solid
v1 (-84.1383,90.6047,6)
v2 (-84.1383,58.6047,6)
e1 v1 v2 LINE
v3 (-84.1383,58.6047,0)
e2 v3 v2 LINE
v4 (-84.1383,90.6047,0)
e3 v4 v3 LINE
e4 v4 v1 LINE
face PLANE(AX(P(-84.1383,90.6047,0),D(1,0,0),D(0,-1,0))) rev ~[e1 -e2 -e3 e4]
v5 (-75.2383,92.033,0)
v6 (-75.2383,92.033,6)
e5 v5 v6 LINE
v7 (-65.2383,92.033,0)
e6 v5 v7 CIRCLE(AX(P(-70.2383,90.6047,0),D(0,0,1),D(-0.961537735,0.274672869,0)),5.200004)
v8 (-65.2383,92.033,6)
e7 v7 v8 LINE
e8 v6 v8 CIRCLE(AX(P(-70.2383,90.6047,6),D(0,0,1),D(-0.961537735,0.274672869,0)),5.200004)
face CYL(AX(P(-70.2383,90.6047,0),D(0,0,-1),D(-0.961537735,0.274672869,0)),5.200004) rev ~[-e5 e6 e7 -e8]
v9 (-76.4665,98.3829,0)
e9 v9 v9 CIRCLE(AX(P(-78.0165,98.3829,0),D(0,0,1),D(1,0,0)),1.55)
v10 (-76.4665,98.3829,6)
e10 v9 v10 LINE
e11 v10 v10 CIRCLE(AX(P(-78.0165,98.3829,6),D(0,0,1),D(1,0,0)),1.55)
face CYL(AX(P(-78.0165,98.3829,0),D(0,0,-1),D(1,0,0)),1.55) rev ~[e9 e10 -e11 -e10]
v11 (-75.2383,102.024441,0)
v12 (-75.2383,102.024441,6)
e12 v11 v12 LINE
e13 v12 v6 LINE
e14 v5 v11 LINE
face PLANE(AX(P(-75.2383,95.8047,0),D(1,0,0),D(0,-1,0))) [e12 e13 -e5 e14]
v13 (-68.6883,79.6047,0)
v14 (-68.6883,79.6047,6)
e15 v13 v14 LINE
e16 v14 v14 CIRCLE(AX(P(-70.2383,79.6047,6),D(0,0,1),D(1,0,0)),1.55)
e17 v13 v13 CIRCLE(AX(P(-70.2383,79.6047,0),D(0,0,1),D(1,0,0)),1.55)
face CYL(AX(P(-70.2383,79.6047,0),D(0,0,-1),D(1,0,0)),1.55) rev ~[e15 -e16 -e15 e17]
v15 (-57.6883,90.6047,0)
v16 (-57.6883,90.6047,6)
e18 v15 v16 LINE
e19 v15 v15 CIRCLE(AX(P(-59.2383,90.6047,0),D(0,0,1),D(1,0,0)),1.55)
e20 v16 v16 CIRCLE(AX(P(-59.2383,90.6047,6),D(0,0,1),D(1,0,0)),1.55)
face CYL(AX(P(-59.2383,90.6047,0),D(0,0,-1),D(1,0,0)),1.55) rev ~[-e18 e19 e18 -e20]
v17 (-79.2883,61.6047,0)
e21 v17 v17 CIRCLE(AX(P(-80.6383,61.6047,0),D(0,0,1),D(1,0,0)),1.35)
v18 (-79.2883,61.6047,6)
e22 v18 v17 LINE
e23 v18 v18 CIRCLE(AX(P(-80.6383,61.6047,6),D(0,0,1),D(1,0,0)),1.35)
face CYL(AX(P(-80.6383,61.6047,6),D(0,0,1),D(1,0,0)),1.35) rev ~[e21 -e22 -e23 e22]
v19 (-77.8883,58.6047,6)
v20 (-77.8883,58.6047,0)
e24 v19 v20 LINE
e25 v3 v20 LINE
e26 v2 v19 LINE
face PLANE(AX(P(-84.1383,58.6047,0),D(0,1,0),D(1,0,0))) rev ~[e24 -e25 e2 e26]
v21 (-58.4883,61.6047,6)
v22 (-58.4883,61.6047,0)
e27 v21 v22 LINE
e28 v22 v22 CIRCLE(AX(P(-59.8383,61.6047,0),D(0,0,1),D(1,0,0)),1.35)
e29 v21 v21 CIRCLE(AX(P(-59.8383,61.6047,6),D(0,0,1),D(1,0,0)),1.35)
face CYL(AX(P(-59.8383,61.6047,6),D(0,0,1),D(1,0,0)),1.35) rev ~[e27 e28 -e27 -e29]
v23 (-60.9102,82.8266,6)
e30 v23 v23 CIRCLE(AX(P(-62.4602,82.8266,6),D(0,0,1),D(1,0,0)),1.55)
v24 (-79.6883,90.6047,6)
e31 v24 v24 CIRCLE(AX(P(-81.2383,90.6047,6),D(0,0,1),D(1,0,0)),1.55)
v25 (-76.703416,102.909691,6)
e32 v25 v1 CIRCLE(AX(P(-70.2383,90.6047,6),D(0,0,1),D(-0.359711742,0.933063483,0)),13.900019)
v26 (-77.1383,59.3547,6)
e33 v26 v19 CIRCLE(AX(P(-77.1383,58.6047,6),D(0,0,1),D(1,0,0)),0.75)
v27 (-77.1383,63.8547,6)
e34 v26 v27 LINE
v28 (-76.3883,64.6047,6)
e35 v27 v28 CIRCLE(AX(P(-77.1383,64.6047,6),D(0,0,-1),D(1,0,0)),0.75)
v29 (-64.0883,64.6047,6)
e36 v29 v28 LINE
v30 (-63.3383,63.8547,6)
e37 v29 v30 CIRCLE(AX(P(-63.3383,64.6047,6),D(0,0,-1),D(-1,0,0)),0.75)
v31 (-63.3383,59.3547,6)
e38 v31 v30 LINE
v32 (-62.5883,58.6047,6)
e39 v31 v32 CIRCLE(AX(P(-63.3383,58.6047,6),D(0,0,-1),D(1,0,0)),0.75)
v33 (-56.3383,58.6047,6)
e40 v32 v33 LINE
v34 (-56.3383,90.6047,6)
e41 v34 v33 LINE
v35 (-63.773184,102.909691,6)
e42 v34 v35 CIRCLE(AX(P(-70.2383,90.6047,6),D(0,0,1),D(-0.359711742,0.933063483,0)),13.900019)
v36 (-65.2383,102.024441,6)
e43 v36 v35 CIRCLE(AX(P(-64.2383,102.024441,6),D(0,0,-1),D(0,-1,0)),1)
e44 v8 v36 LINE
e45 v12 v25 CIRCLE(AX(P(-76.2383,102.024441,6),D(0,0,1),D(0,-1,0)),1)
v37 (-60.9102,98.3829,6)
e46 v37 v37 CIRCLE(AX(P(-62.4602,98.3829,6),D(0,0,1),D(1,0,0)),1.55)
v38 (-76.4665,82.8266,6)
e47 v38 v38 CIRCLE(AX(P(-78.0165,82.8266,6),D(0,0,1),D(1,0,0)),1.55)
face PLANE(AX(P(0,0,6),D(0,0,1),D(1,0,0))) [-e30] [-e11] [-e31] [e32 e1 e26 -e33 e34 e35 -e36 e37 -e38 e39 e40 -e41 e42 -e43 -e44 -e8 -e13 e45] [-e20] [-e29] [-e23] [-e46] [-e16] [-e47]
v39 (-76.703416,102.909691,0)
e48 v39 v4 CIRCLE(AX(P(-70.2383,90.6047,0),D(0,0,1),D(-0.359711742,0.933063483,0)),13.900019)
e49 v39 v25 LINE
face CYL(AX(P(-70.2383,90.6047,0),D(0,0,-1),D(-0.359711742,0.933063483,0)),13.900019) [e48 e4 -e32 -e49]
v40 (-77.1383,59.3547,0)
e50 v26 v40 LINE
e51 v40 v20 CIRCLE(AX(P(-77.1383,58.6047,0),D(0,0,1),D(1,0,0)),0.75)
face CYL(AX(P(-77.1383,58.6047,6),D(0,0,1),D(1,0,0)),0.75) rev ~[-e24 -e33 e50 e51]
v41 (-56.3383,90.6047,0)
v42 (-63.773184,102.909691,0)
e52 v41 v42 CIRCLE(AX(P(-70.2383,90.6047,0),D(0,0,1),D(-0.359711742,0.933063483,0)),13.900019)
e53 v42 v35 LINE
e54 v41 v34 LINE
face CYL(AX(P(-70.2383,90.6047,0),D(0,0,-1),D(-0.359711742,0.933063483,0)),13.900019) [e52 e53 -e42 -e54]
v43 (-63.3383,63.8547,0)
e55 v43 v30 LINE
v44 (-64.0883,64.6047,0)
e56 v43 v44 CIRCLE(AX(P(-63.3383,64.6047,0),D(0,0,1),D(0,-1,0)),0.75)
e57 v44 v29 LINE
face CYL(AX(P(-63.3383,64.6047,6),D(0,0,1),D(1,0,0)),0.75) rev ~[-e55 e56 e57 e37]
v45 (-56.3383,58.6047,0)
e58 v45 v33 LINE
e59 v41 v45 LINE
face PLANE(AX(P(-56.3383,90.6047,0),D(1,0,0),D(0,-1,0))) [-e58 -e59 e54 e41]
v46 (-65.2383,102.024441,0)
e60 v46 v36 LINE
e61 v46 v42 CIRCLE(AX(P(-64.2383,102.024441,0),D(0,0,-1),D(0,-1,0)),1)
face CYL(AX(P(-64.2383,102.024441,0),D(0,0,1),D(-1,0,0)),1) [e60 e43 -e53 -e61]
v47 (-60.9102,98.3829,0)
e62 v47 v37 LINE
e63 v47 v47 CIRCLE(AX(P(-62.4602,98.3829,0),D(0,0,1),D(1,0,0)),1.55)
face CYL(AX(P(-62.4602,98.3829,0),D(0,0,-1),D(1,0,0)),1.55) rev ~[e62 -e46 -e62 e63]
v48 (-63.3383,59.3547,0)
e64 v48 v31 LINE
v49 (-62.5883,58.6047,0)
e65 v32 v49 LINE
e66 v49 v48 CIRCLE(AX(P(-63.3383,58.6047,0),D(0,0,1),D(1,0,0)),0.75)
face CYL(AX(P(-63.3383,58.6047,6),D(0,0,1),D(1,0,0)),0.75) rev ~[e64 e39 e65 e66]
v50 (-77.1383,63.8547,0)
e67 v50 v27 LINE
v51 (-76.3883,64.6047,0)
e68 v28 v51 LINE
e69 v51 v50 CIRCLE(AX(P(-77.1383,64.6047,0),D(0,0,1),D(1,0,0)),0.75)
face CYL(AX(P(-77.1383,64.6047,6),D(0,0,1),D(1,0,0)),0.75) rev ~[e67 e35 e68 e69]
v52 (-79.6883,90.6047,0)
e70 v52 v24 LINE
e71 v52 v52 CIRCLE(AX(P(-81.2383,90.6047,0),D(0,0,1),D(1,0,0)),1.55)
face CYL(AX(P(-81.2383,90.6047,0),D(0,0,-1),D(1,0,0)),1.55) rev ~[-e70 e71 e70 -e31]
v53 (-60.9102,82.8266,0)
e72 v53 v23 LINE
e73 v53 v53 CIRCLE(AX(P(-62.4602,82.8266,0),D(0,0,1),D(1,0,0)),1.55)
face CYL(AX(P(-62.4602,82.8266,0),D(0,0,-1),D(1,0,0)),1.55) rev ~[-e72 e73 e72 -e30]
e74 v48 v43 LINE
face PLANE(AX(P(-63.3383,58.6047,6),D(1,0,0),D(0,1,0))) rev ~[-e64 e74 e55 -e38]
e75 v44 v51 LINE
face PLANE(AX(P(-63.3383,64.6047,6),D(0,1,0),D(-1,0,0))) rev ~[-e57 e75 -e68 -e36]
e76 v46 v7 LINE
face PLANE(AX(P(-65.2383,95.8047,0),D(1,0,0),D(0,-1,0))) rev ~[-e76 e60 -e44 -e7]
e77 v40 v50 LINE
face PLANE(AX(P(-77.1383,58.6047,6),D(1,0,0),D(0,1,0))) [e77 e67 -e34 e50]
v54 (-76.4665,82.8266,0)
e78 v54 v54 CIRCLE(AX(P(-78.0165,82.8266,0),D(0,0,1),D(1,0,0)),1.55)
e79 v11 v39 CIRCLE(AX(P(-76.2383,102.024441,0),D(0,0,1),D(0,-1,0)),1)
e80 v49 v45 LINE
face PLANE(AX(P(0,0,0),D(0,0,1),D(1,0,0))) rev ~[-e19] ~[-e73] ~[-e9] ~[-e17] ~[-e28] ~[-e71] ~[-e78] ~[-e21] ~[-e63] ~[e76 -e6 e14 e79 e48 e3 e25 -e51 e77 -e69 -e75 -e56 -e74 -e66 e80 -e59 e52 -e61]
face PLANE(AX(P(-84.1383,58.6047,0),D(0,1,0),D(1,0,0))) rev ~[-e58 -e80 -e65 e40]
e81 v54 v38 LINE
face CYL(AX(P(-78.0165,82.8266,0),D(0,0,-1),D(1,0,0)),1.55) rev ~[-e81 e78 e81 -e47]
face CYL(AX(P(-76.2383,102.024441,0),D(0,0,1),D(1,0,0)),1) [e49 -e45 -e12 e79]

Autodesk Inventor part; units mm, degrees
ref_plane "YZ Plane" through (0, 0, 0) normal (1, 0, 0) x (0, 1, 0)
ref_plane "XZ Plane" through (0, 0, 0) normal (0, 1, 0) x (-1, 0, 0)
ref_plane "작업 평면1" through (0, 0, 0) normal (0, 0, 1) x (1, 0, 0)
sketch "스케치1" plane through (0, 0, 0) normal (0, 0, 1) x (1, 0, 0)
  circle A0 centre (-78.0165, 82.8266) radius 1.55
  circle A1 centre (-62.4602, 82.8266) radius 1.55
  circle A2 centre (-62.4602, 98.3829) radius 1.55
  circle A3 centre (-78.0165, 98.3829) radius 1.55
  circle A4 centre (-70.2383, 101.6047) radius 1.55
  circle A5 centre (-59.2383, 90.6047) radius 1.55
  circle A6 centre (-70.2383, 79.6047) radius 1.55
  circle A7 centre (-81.2383, 90.6047) radius 1.55
  arc A8 (-75.2383, 92.033) -> (-65.2383, 92.033) centre (-70.2383, 90.6047) ccw
  arc A9 (-75.2383, 103.5743) -> (-65.2383, 103.5743) centre (-70.2383, 90.6047) ccw
  line L0 (-65.2383, 95.8047) -> (-65.2383, 103.5743)
  line L1 (-75.2383, 95.8047) -> (-75.2383, 103.5743)
  line L2 (-65.2383, 95.8047) -> (-65.2383, 92.033)
  line L3 (-75.2383, 95.8047) -> (-75.2383, 92.033)
  circle A10 centre (-70.2383, 90.6047) radius 1.5
  circle A11 centre (-62.4602, 98.3829) radius 1.65
  circle A12 centre (-59.2383, 90.6047) radius 1.65
  circle A13 centre (-62.4602, 82.8266) radius 1.65
  circle A14 centre (-70.2383, 79.6047) radius 1.65
  circle A15 centre (-78.0165, 82.8266) radius 1.65
  circle A16 centre (-81.2383, 90.6047) radius 1.65
  circle A17 centre (-78.0165, 98.3829) radius 1.65
  line L4 (-56.3383, 90.6047) -> (-56.3383, 58.6047)
  line L5 (-84.1383, 90.6047) -> (-84.1383, 58.6047)
  arc A18 (-75.2383, 103.5743) -> (-84.1383, 90.6047) centre (-70.2383, 90.6047) ccw
  arc A19 (-56.3383, 90.6047) -> (-65.2383, 103.5743) centre (-70.2383, 90.6047) ccw
  line L6 (-84.1383, 58.6047) -> (-56.3383, 58.6047)
  arc A20 (-56.3383, 90.6047) -> (-65.2383, 103.5743) centre (-70.2383, 90.6047) ccw
  arc A21 (-75.2383, 103.5743) -> (-84.1383, 90.6047) centre (-70.2383, 90.6047) ccw
  point P0 (-52.7957, 62.4635)
  point P1 (-70.2383, 90.6047)
  point P2 (-85.25, 10.6344)
  point P3 (-75.25, 10.6344)
  point P4 (-94.15, -2.3352)
  point P5 (-66.35, -2.3352)
  point P6 (-88.3823, -54.5283)
  point P7 (-48.1823, -54.5283)
  point P8 (-88.3823, -54.5283)
  point P9 (-82.9823, -51.5283)
  point P10 (-53.5823, -51.5283)
  point P11 (-48.1823, -54.5283)
  point P12 (-84.1383, 90.6047)
  point P13 (-56.3383, 90.6047)
  dimension "d0" = 0.1
  dimension "d1" = 0.1
  dimension "d2" = 0.1
  dimension "d3" = 0.1
  dimension "d4" = 0.1
  dimension "d5" = 0.1
  dimension "d6" = 0.1
  dimension "d7" = 32
  dimension "d8" = 32
  dimension "d19" = 27.8
extrude "돌출1" add sketch "스케치1" along normal blind 6 contours A8 L2 L0 A9 L1 L3 | A9 L4 L6 L5 | A11 | A12 | A13 | A14 | A15 | A16 | A17
sketch "스케치2" plane through (0, 0, 6) normal (0, 0, 1) x (1, 0, 0)
  line L0 (-65.2383, 103.5743) -> (-65.2383, 92.033) projected
  arc A0 (-75.2383, 92.033) -> (-65.2383, 92.033) centre (-70.2383, 90.6047) ccw projected
  line L1 (-75.2383, 92.033) -> (-75.2383, 103.5743) projected
  arc A1 (-75.2383, 103.5743) -> (-84.1383, 90.6047) centre (-70.2383, 90.6047) ccw projected
  line L2 (-84.1383, 90.6047) -> (-84.1383, 58.6047) projected
  line L3 (-84.1383, 58.6047) -> (-56.3383, 58.6047) projected
  line L4 (-56.3383, 58.6047) -> (-56.3383, 90.6047) projected
  arc A2 (-56.3383, 90.6047) -> (-65.2383, 103.5743) centre (-70.2383, 90.6047) ccw projected
  line L5 (-84.1383, 58.6047) -> (-56.3383, 58.6047)
  line L6 (-56.3383, 58.6047) -> (-56.3383, 64.6047)
  line L7 (-56.3383, 64.6047) -> (-84.1383, 64.6047)
  line L8 (-84.1383, 64.6047) -> (-84.1383, 58.6047)
  line L9 (-84.1383, 58.6047) -> (-77.1383, 58.6047)
  line L10 (-77.1383, 58.6047) -> (-63.3383, 58.6047)
  line L11 (-63.3383, 58.6047) -> (-56.3383, 58.6047)
  line L12 (-63.3383, 58.6047) -> (-63.3383, 64.6047)
  line L13 (-77.1383, 58.6047) -> (-77.1383, 64.6047)
  point P0 (0, 0)
  point P1 (-56.3383, 61.6047)
  point P2 (-63.3383, 61.6047)
  dimension "d20" = 6
  dimension "d21" = 7
  dimension "d22" = 13.8
  dimension "d23" = 7
extrude "돌출2" cut sketch "스케치2" against normal blind 10 contours L12 L3 L13 L7
sketch "스케치3" plane through (0, 0, 6) normal (0, 0, 1) x (1, 0, 0)
  line L0 (-63.3383, 64.6047) -> (-63.3383, 58.6047) projected
  line L1 (-63.3383, 58.6047) -> (-56.3383, 58.6047) projected
  line L2 (-56.3383, 58.6047) -> (-56.3383, 90.6047) projected
  arc A0 (-56.3383, 90.6047) -> (-65.2383, 103.5743) centre (-70.2383, 90.6047) ccw projected
  line L3 (-65.2383, 103.5743) -> (-65.2383, 92.033) projected
  arc A1 (-75.2383, 92.033) -> (-65.2383, 92.033) centre (-70.2383, 90.6047) ccw projected
  line L4 (-75.2383, 92.033) -> (-75.2383, 103.5743) projected
  arc A2 (-75.2383, 103.5743) -> (-84.1383, 90.6047) centre (-70.2383, 90.6047) ccw projected
  line L5 (-84.1383, 90.6047) -> (-84.1383, 58.6047) projected
  line L6 (-84.1383, 58.6047) -> (-77.1383, 58.6047) projected
  line L7 (-77.1383, 58.6047) -> (-77.1383, 64.6047) projected
  line L8 (-77.1383, 64.6047) -> (-63.3383, 64.6047) projected
  circle A3 centre (-59.8383, 61.6047) radius 1.35
  circle A4 centre (-80.6383, 61.6047) radius 1.35
  point P0 (0, 0)
  dimension "d26" = 2.7
  dimension "d27" = 2.7
  dimension "d30" = 20.8
extrude "돌출3" cut sketch "스케치3" against normal blind 10 contours A3 | A4
fillet "모깎기1" radius 1 2 edges at (-75.2383, 103.5743, 3) (-65.2383, 103.5743, 3)
sketch "스케치5" plane through (0, 0, 6) normal (0, 0, 1) x (1, 0, 0)
  arc A0 (-63.7732, 102.9097) -> (-65.2383, 102.0245) centre (-64.2383, 102.0245) ccw projected
  line L0 (-65.2383, 102.0245) -> (-65.2383, 92.033) projected
  arc A1 (-75.2383, 92.033) -> (-65.2383, 92.033) centre (-70.2383, 90.6047) ccw projected
  line L1 (-75.2383, 92.033) -> (-75.2383, 102.0245) projected
  arc A2 (-75.2383, 102.0245) -> (-76.7034, 102.9097) centre (-76.2383, 102.0245) ccw projected
  arc A3 (-76.7034, 102.9097) -> (-84.1383, 90.6047) centre (-70.2383, 90.6047) ccw projected
  line L2 (-84.1383, 90.6047) -> (-84.1383, 58.6047) projected
  line L3 (-84.1383, 58.6047) -> (-77.1383, 58.6047) projected
  line L4 (-77.1383, 58.6047) -> (-77.1383, 64.6047) projected
  line L5 (-77.1383, 64.6047) -> (-63.3383, 64.6047) projected
  line L6 (-63.3383, 64.6047) -> (-63.3383, 58.6047) projected
  line L7 (-63.3383, 58.6047) -> (-56.3383, 58.6047) projected
  line L8 (-56.3383, 58.6047) -> (-56.3383, 90.6047) projected
  arc A4 (-56.3383, 90.6047) -> (-63.7732, 102.9097) centre (-70.2383, 90.6047) ccw projected
  circle A5 centre (-59.8383, 61.6047) radius 1.35 projected
  circle A6 centre (-80.6383, 61.6047) radius 1.35 projected
  circle A7 centre (-62.4602, 98.3829) radius 1.55 projected
  circle A8 centre (-59.2383, 90.6047) radius 1.55 projected
  circle A9 centre (-62.4602, 82.8266) radius 1.55 projected
  circle A10 centre (-70.2383, 79.6047) radius 1.55 projected
  circle A11 centre (-78.0165, 82.8266) radius 1.55 projected
  circle A12 centre (-81.2383, 90.6047) radius 1.55 projected
  circle A13 centre (-78.0165, 98.3829) radius 1.55 projected
  circle A14 centre (-77.1383, 58.6047) radius 0.75
  line L9 (-77.1383, 58.6047) -> (-77.1383, 64.6047) projected
  circle A15 centre (-77.1383, 64.6047) radius 0.75
  circle A16 centre (-63.3383, 64.6047) radius 0.75
  circle A17 centre (-63.3383, 58.6047) radius 0.75
  point P0 (0, 0)
  point P1 (-77.1383, 59.3547)
  point P2 (-77.8883, 58.6047)
  dimension "d32" = 1.5
  dimension "d33" = 1.5
  dimension "d34" = 1.5
  dimension "d35" = 1.5
extrude "돌출4" cut sketch "스케치5" against normal blind 10 contours A17 L6 L7 | L7 L6 A17 | A16 L5 L6 | L6 L5 A16 | A15 L4 L5 | L5 L4 A15 | A14 L4 L3 picked at (-77.3024, 59.0737)
properties part number "frame_knee_to_pelvis1" material "PMMA 플라스틱"
